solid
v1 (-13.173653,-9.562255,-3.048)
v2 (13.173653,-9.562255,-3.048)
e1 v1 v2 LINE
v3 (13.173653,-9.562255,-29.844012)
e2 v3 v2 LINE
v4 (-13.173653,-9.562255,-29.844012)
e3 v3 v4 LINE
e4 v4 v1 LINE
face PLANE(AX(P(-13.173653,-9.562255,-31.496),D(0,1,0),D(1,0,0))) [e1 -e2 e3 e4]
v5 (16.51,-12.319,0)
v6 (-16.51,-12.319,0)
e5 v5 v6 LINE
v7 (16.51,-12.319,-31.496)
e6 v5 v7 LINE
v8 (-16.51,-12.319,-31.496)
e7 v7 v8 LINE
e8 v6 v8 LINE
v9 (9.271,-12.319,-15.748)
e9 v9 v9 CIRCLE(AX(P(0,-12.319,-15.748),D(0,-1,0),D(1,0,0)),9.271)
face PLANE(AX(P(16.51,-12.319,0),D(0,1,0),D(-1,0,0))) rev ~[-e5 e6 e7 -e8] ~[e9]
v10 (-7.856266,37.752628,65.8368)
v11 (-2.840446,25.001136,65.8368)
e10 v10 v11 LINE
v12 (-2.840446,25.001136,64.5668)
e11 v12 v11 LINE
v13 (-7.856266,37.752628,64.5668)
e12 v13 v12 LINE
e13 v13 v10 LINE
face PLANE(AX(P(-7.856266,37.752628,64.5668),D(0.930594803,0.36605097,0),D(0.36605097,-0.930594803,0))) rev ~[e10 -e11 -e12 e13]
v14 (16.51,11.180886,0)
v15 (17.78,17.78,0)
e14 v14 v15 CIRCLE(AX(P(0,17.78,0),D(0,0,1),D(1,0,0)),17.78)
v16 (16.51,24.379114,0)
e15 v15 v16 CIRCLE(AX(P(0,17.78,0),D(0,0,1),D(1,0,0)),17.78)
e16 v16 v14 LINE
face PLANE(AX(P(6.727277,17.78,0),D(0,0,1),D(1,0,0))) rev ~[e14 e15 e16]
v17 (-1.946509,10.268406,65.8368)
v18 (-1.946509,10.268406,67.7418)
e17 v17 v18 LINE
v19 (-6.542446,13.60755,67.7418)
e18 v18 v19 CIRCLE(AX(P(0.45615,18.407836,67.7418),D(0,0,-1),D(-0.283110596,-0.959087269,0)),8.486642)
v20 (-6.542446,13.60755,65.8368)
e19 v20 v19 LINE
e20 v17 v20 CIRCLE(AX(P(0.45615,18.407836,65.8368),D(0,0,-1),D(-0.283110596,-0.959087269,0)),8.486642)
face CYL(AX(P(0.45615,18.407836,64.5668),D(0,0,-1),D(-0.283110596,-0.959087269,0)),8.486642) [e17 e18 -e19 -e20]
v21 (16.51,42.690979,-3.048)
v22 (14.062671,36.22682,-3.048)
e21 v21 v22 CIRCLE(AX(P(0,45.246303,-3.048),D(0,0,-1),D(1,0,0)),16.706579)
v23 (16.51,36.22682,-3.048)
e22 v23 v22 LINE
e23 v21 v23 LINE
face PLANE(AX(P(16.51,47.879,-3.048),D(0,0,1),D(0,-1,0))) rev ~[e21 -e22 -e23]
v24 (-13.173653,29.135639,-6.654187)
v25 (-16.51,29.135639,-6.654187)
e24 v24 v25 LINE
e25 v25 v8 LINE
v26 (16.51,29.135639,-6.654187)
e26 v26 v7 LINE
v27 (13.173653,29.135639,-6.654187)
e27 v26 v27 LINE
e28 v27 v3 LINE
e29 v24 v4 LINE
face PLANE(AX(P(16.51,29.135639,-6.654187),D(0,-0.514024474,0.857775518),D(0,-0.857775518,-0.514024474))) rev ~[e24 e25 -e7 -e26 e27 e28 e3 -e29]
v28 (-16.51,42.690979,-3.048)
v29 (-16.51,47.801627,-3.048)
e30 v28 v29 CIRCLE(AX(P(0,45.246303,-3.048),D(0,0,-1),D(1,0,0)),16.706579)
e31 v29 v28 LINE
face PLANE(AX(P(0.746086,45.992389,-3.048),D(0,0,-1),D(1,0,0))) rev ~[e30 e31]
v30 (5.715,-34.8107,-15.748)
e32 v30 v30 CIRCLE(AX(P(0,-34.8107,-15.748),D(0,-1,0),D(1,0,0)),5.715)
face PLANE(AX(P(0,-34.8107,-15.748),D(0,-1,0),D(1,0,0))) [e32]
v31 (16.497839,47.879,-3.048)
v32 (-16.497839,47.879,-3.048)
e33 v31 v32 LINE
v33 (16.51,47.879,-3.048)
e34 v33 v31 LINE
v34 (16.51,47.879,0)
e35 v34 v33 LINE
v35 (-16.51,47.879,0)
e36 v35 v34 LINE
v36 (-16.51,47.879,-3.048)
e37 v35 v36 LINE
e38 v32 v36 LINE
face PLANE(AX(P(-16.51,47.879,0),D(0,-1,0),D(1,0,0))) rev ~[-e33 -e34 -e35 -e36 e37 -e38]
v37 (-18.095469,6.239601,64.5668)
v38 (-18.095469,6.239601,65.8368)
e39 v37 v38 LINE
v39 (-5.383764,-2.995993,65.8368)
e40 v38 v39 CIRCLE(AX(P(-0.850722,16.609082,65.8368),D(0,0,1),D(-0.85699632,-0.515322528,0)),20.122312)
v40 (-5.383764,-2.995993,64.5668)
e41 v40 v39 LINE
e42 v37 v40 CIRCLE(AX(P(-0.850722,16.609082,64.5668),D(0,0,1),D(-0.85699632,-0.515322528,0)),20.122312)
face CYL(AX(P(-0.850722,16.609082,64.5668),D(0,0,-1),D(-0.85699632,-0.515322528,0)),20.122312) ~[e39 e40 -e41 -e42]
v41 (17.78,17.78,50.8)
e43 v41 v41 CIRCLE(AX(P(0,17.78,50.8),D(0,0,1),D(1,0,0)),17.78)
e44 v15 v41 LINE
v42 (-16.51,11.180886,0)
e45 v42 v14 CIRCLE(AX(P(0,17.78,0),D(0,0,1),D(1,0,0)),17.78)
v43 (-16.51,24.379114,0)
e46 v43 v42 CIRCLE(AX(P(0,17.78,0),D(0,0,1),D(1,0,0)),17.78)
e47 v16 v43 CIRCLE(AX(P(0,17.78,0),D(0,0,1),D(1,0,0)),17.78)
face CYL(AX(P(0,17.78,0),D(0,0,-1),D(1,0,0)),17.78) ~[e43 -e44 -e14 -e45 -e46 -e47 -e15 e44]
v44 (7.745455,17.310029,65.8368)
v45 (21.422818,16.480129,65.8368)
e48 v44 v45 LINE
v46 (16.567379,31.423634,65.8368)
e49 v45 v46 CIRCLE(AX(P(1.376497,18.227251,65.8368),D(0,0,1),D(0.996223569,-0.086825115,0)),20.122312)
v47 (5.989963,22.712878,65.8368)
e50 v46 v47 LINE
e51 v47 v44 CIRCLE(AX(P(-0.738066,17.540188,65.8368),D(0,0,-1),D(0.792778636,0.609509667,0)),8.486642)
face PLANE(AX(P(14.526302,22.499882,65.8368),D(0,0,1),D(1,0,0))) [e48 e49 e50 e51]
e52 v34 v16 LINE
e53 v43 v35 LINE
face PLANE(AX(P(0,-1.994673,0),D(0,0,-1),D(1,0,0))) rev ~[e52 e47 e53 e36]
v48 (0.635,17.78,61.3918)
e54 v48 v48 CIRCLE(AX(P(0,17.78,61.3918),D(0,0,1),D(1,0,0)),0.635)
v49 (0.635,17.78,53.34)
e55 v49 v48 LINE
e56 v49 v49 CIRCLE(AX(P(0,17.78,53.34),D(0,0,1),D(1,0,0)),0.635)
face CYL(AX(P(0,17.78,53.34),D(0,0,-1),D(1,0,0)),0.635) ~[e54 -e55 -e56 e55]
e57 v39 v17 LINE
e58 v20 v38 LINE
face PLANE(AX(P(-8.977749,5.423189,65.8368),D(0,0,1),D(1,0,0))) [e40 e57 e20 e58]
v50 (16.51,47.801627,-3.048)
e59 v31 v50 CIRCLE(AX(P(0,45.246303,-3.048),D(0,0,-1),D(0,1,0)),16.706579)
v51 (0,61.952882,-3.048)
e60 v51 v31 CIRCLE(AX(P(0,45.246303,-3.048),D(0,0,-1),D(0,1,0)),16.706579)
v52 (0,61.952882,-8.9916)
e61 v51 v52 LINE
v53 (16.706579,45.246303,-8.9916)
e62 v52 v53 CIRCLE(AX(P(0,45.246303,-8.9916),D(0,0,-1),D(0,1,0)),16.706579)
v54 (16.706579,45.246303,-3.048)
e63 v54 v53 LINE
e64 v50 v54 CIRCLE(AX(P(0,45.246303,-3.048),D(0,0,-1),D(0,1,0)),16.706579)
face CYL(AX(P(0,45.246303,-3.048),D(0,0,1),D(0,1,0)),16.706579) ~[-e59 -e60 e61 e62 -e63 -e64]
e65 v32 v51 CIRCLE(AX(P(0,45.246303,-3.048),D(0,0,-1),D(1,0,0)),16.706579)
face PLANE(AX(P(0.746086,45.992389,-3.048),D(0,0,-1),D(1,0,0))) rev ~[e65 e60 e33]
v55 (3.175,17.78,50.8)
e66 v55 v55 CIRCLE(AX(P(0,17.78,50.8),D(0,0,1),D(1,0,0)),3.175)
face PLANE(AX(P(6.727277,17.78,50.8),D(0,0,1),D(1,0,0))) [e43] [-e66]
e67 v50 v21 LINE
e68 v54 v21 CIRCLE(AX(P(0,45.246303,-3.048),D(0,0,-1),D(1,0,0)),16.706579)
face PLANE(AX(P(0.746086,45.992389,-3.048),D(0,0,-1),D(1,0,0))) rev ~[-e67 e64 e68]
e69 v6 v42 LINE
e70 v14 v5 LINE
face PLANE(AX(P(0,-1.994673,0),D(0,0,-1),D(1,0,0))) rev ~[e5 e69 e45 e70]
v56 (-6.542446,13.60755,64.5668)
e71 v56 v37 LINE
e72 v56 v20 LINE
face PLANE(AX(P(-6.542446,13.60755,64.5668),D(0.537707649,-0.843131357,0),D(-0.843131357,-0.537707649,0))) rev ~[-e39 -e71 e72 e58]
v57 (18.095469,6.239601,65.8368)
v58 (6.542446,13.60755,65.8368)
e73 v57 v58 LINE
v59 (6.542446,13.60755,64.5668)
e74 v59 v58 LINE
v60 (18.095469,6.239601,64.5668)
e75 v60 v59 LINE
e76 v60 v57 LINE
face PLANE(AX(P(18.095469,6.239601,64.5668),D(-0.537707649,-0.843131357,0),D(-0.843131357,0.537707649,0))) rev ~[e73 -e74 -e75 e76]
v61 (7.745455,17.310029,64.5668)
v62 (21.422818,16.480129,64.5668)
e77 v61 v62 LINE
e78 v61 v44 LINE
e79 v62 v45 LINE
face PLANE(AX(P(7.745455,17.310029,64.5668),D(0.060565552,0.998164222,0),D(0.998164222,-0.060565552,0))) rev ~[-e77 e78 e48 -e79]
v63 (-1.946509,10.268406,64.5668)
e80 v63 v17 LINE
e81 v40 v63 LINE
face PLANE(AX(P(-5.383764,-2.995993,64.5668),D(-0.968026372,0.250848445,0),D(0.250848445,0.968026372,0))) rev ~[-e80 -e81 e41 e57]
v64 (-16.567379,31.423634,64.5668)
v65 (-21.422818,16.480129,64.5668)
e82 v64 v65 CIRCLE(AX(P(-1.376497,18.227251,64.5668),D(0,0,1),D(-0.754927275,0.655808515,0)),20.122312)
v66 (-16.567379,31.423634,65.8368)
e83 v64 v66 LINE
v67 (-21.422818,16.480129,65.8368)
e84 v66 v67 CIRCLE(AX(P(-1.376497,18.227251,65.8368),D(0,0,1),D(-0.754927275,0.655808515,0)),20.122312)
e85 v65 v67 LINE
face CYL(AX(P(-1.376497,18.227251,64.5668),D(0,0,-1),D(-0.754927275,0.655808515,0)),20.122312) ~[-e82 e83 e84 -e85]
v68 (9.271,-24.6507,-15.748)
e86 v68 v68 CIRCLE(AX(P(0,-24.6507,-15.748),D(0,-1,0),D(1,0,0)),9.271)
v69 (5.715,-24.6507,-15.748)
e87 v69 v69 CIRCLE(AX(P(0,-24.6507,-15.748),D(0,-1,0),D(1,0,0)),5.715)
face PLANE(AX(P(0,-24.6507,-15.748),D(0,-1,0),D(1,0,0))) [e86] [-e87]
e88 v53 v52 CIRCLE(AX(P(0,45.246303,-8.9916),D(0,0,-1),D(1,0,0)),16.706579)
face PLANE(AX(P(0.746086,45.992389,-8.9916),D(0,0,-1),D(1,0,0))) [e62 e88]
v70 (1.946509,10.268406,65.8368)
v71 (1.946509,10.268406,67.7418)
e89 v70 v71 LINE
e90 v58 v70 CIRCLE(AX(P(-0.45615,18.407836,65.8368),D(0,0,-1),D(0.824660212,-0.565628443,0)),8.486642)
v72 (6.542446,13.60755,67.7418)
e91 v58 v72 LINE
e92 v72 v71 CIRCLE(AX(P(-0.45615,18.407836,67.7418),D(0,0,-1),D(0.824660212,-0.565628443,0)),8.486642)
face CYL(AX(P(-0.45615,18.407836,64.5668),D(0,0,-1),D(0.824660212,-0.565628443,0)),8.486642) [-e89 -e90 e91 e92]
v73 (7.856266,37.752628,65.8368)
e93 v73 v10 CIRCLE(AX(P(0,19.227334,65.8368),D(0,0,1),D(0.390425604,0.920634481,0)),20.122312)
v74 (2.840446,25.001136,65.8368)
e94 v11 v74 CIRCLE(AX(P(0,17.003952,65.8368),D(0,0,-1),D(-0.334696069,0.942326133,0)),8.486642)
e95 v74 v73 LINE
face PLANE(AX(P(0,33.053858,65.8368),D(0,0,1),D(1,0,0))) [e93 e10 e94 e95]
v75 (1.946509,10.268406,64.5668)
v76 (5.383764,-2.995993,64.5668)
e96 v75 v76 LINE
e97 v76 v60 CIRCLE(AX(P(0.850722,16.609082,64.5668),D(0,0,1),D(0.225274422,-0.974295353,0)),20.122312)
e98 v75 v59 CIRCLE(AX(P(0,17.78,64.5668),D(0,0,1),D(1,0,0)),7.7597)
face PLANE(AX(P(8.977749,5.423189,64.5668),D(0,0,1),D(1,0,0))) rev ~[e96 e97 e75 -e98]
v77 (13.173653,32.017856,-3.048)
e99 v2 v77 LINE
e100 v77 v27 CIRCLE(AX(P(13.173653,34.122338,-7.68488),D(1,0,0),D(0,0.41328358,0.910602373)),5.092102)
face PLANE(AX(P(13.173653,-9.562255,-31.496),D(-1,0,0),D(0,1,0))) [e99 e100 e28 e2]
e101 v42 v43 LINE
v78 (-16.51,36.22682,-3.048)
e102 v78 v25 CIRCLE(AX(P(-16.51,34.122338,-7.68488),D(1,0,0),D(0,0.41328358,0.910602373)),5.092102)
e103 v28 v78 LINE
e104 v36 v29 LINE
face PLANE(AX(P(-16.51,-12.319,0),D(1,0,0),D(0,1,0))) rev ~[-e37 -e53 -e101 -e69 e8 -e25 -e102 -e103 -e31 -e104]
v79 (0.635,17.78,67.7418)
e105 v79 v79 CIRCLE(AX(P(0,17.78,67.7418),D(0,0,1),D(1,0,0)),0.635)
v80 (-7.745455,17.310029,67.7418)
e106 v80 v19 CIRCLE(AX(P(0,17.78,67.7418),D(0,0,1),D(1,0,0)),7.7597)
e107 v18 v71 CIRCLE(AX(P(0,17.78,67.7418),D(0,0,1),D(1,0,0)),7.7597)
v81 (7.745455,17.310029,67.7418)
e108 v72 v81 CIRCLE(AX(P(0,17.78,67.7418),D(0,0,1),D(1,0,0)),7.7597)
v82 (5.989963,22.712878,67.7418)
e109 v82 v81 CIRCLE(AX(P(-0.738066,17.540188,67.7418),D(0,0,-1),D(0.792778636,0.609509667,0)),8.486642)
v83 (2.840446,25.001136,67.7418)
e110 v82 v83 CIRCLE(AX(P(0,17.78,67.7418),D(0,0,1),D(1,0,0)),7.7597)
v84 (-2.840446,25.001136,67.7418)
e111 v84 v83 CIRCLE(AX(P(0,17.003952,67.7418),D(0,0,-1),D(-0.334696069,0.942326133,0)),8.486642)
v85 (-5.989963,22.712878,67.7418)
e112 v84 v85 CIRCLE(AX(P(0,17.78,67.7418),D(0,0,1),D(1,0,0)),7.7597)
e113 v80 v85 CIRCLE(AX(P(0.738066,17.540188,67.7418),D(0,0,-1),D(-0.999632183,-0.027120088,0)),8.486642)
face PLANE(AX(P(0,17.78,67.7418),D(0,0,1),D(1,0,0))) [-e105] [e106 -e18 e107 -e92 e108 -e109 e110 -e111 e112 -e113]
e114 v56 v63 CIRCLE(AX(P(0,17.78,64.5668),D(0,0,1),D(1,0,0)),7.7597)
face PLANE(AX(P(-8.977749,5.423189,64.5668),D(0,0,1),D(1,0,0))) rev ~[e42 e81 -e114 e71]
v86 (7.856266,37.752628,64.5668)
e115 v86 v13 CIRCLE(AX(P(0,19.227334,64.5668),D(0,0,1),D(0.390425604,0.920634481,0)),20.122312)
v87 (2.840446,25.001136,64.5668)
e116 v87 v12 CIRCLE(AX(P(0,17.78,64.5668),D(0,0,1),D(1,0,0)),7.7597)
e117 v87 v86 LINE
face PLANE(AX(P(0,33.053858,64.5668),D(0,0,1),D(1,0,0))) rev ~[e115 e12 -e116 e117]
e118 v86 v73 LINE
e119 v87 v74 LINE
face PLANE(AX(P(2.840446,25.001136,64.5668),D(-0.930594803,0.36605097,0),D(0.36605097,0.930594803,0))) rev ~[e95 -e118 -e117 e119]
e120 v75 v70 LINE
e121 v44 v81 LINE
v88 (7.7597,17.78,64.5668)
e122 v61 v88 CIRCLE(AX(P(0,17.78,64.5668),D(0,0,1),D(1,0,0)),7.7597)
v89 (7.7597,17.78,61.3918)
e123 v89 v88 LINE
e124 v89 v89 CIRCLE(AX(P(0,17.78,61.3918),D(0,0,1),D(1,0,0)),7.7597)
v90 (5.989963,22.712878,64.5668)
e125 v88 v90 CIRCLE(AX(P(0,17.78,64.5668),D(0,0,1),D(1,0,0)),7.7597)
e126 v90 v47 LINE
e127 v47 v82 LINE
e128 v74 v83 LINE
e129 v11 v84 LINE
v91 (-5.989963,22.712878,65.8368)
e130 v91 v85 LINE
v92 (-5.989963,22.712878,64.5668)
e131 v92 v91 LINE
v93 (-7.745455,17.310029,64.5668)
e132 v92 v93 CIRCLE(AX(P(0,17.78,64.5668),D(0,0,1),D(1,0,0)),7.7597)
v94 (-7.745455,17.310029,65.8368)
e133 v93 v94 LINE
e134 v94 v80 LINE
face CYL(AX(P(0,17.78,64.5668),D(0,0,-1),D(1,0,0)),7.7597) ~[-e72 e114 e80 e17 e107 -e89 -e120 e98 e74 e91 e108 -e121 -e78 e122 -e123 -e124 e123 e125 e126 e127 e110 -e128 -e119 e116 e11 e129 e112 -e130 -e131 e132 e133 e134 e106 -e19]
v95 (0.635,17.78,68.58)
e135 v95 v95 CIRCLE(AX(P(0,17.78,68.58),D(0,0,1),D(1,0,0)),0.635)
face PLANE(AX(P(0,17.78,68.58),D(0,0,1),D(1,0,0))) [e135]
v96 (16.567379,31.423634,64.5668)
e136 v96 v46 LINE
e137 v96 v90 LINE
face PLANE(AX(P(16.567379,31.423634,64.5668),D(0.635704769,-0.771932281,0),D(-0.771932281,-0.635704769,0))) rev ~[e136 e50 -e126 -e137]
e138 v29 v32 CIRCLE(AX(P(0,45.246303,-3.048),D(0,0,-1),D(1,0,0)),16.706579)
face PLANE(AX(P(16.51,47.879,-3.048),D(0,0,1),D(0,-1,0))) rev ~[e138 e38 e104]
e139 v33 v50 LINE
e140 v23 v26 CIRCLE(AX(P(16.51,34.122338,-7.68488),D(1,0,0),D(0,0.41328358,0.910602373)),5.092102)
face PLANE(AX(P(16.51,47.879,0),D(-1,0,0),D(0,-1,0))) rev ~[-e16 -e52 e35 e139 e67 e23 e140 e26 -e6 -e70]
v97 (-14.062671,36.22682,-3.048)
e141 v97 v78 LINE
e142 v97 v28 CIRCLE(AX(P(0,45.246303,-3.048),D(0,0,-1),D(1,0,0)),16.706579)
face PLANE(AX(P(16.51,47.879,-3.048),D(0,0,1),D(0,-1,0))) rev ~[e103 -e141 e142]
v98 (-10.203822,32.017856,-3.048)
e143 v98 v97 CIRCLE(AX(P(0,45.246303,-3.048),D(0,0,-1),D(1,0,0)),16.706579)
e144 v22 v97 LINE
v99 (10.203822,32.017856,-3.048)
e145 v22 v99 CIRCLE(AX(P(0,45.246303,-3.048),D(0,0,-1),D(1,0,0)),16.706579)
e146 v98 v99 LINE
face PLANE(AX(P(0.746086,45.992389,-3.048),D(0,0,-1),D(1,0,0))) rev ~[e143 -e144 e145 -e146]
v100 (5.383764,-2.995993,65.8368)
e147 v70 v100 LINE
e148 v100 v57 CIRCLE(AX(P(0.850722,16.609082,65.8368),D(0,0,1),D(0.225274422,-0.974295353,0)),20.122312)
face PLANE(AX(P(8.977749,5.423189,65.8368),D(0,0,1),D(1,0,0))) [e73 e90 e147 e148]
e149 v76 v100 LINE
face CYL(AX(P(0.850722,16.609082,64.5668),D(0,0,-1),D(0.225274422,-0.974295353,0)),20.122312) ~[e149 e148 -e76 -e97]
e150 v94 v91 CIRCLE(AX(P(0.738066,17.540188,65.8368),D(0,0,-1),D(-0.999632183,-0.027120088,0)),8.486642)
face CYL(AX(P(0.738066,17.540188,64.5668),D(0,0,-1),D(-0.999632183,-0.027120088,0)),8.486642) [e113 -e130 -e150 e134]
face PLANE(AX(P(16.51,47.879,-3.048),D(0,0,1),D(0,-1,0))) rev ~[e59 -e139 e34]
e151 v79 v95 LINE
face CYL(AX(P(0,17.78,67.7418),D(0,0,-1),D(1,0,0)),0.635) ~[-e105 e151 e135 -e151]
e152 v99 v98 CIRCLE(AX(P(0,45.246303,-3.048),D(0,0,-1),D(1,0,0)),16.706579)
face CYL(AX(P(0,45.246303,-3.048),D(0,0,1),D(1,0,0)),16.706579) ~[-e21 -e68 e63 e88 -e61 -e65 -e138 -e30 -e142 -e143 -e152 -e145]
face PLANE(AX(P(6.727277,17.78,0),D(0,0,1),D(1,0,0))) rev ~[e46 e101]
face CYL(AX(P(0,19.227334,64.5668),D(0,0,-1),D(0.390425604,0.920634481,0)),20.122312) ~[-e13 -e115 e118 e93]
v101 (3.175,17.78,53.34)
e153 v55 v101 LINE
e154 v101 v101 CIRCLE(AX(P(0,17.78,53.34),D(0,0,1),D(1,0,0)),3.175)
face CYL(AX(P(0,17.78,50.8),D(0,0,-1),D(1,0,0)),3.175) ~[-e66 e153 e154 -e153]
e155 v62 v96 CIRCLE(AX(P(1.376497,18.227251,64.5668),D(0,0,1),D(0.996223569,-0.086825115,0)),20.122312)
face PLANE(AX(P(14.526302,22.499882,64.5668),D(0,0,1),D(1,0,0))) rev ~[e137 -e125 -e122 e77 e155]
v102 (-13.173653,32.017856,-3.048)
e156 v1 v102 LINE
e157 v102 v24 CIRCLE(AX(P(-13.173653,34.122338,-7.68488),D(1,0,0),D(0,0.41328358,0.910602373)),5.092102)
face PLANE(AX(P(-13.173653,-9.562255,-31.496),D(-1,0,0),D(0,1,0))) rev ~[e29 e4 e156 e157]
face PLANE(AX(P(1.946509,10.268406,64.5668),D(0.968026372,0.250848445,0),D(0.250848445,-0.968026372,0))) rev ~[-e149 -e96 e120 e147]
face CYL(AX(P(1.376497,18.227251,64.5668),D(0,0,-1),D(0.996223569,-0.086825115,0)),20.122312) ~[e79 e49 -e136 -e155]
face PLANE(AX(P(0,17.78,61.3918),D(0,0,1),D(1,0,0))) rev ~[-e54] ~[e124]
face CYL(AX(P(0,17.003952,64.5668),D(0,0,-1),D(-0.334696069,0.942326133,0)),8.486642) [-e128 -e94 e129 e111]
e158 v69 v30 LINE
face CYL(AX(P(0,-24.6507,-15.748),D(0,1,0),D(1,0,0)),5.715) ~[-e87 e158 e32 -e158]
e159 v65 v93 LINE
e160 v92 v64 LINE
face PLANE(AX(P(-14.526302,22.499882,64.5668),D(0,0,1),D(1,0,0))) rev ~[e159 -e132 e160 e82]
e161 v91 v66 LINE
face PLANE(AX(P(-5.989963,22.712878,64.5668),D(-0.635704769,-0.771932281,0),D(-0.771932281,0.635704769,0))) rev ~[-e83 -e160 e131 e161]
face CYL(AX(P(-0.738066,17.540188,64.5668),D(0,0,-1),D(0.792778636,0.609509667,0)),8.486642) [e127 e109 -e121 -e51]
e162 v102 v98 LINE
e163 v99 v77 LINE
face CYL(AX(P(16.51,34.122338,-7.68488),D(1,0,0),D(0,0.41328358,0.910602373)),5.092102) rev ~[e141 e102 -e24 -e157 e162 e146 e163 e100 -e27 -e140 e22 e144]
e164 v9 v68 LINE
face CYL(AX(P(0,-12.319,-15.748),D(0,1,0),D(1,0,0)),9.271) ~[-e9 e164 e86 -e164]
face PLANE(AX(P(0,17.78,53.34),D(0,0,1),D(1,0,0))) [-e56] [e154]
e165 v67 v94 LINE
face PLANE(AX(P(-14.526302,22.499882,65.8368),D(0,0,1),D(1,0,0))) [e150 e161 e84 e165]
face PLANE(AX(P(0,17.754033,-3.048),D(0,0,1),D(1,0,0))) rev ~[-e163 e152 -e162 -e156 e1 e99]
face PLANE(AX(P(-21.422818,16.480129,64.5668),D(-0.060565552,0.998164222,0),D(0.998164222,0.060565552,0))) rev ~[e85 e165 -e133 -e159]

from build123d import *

# Parameters (mm, degrees)
F1_DEPTH  = 50.8
F2_R      = 3.175
F3_DEPTH  = 2.54
F4_R      = 0.635
F5_DEPTH  = 8.0518
F6_R      = 7.7597
F7_DEPTH  = 3.175
F9_DEPTH  = 1.27
F10_DEPTH = 3.175
F11_R     = 0.635
F12_DEPTH = 0.8382
F14_DEPTH = 31.496
F16_DEPTH = 51.816
F18_W     = 26.3473056257
F18_H     = 54.6325752512
F19_DEPTH = 28.448
F21_DEPTH = 5.9436
F22_R     = 9.271
F23_DEPTH = 12.3317
F26_R     = 5.715
F27_DEPTH = 10.16


# Not quite as in the source:
# - a length typed as a fraction of an inch, garbled in the dataset ("3 / 203.2 mm" for 3/8 in), is restored


with BuildPart() as f1:
    # F0 (on Top) → F1 (new body)
    with BuildSketch(Plane.XY):
        with BuildLine():
            Line((0, 35.56), (0, 0))
            ThreePointArc((0, 0), (12.5723585695, 5.2076414305), (17.78, 17.78))
            ThreePointArc((17.78, 17.78), (12.5723585695, 30.3523585695), (0, 35.56))
        make_face()
        with BuildLine():
            ThreePointArc((0, 35.56), (-17.78, 17.78), (0, 0))
            Line((0, 0), (0, 35.56))
        make_face()
    extrude(amount=F1_DEPTH)

    # F2 (on face) → F3 (join)
    with BuildSketch(Plane.XY.offset(50.8)):
        with Locations((0, 17.78)):
            Circle(F2_R)
    extrude(amount=F3_DEPTH)

    # F4 (on face) → F5 (join)
    with BuildSketch(Plane.XY.offset(53.34)):
        with Locations((0, 17.78)):
            Circle(F4_R)
    extrude(amount=F5_DEPTH)

    # F6 (on face) → F7 (join)
    with BuildSketch(Plane.XY.offset(61.3918)):
        with Locations((0, 17.78)):
            Circle(F6_R)
    extrude(amount=F7_DEPTH)

    # F8 (on face) → F9 (join)
    with BuildSketch(Plane.XY.offset(64.5668)):
        with BuildLine():
            Line((-7.8562656417, 37.7526283264), (-2.8404457135, 25.0011364922))
            ThreePointArc((-2.8404457135, 25.0011364922), (0, 25.4905939517), (2.8404457135, 25.0011364922))
            Line((2.8404457135, 25.0011364922), (7.8562656417, 37.7526283264))
            ThreePointArc((7.8562656417, 37.7526283264), (0, 39.3496460261), (-7.8562656417, 37.7526283264))
        make_face()
        with BuildLine():
            ThreePointArc((-7.745454913, 17.3100294897), (-7.3332106223, 20.1627045678), (-5.9899629188, 22.7128782998))
            Line((-5.9899629188, 22.7128782998), (-16.5673787218, 31.4236342075))
            ThreePointArc((-16.5673787218, 31.4236342075), (-20.5139524073, 24.4453871847), (-21.422817913, 16.4801289429))
            Line((-21.422817913, 16.4801289429), (-7.745454913, 17.3100294897))
        make_face()
        with BuildLine():
            ThreePointArc((-1.946508681, 10.2684057588), (-4.5321734112, 11.5419984564), (-6.5424463887, 13.6075499595))
            Line((-6.5424463887, 13.6075499595), (-18.0954687963, 6.2396013439))
            ThreePointArc((-18.0954687963, 6.2396013439), (-12.6783198313, 0.3297898022), (-5.3837639633, -2.9959928207))
            Line((-5.3837639633, -2.9959928207), (-1.946508681, 10.2684057588))
        make_face()
        with BuildLine():
            ThreePointArc((6.5424463887, 13.6075499595), (4.5321734112, 11.5419984564), (1.946508681, 10.2684057588))
            Line((1.946508681, 10.2684057588), (5.3837639633, -2.9959928207))
            ThreePointArc((5.3837639633, -2.9959928207), (12.6783198313, 0.3297898022), (18.0954687963, 6.2396013439))
            Line((18.0954687963, 6.2396013439), (6.5424463887, 13.6075499595))
        make_face()
        with BuildLine():
            ThreePointArc((5.9899629188, 22.7128782998), (7.3332106223, 20.1627045678), (7.745454913, 17.3100294897))
            Line((7.745454913, 17.3100294897), (21.422817913, 16.4801289429))
            ThreePointArc((21.422817913, 16.4801289429), (20.5139524073, 24.4453871847), (16.5673787218, 31.4236342075))
            Line((16.5673787218, 31.4236342075), (5.9899629188, 22.7128782998))
        make_face()
    extrude(amount=F9_DEPTH)

    # F10 (add): a face of the model
    f10_faces = [f1.faces().sort_by_distance(p)[0] for p in [
        (0, 17.78, 64.5668),
    ]]
    extrude(f10_faces, amount=F10_DEPTH)

    # F11 (on face) → F12 (join)
    with BuildSketch(Plane.XY.offset(67.7418)):
        with Locations((0, 17.78)):
            Circle(F11_R)
    extrude(amount=F12_DEPTH)

    # F13 (on face) → F14 (join)
    with BuildSketch(Plane(origin=(0, 0, 0), x_dir=(1, 0, 0), z_dir=(0, 0, -1))):
        with BuildLine():
            Line((-16.51, 12.319), (-16.51, -11.1808864232))
            ThreePointArc((-16.51, -11.1808864232), (0, 0), (16.51, -11.1808864232))
            Line((16.51, -11.1808864232), (16.51, 12.319))
            Line((16.51, 12.319), (-16.51, 12.319))
        make_face()
        with BuildLine():
            ThreePointArc((16.51, -24.3791135768), (0, -35.56), (-16.51, -24.3791135768))
            Line((-16.51, -24.3791135768), (-16.51, -47.879))
            Line((-16.51, -47.879), (16.51, -47.879))
            Line((16.51, -47.879), (16.51, -24.3791135768))
        make_face()
        with BuildLine():
            Line((-16.51, -11.1808864232), (-16.51, -17.78))
            Line((-16.51, -17.78), (-16.51, -24.3791135768))
            ThreePointArc((-16.51, -24.3791135768), (0, -35.56), (16.51, -24.3791135768))
            Line((16.51, -24.3791135768), (16.51, -17.78))
            Line((16.51, -17.78), (16.51, -11.1808864232))
            ThreePointArc((16.51, -11.1808864232), (0, 0), (-16.51, -11.1808864232))
        make_face()
    extrude(amount=F14_DEPTH)

    # F15 (on face) → F16 (cut)
    with BuildSketch(Plane.YZ.offset(16.51)):
        with BuildLine():
            Line((29.1356388479, -6.6541871056), (-12.319, -31.496))
            Line((-12.319, -31.496), (47.879, -31.496))
            Line((47.879, -31.496), (47.879, -3.048))
            Line((47.879, -3.048), (36.2268202007, -3.048))
            ThreePointArc((36.2268202007, -3.048), (31.8141050009, -3.1459858946), (29.1356388479, -6.6541871056))
        make_face()
    extrude(amount=-F16_DEPTH, mode=Mode.SUBTRACT)

    # F18 (on offset) → F19 (cut)
    with BuildSketch(Plane.XY.offset(-31.496)):
        with Locations((0, 17.7540327422)):
            Rectangle(F18_W, F18_H)
    extrude(amount=F19_DEPTH, mode=Mode.SUBTRACT)

    # F20 (on face) → F21 (join)
    with BuildSketch(Plane(origin=(0, 0, -3.048), x_dir=(1, 0, 0), z_dir=(0, 0, -1))):
        with BuildLine():
            ThreePointArc((0, -61.9528820528), (11.813335281, -57.0596383625), (16.7065789713, -45.2463030815))
            ThreePointArc((16.7065789713, -45.2463030815), (-11.813335281, -33.4329678005), (0, -61.9528820528))
        make_face()
    extrude(amount=F21_DEPTH)

    # F22 (on face) → F23 (join)
    with BuildSketch(Plane.XZ.offset(12.319)):
        with Locations((0, -15.748)):
            Circle(F22_R)
    extrude(amount=F23_DEPTH)

    # F26 (on face) → F27 (join)
    with BuildSketch(Plane.XZ.offset(24.6507)):
        with Locations((0, -15.748)):
            Circle(F26_R)
    extrude(amount=F27_DEPTH)


solid = f1.part
